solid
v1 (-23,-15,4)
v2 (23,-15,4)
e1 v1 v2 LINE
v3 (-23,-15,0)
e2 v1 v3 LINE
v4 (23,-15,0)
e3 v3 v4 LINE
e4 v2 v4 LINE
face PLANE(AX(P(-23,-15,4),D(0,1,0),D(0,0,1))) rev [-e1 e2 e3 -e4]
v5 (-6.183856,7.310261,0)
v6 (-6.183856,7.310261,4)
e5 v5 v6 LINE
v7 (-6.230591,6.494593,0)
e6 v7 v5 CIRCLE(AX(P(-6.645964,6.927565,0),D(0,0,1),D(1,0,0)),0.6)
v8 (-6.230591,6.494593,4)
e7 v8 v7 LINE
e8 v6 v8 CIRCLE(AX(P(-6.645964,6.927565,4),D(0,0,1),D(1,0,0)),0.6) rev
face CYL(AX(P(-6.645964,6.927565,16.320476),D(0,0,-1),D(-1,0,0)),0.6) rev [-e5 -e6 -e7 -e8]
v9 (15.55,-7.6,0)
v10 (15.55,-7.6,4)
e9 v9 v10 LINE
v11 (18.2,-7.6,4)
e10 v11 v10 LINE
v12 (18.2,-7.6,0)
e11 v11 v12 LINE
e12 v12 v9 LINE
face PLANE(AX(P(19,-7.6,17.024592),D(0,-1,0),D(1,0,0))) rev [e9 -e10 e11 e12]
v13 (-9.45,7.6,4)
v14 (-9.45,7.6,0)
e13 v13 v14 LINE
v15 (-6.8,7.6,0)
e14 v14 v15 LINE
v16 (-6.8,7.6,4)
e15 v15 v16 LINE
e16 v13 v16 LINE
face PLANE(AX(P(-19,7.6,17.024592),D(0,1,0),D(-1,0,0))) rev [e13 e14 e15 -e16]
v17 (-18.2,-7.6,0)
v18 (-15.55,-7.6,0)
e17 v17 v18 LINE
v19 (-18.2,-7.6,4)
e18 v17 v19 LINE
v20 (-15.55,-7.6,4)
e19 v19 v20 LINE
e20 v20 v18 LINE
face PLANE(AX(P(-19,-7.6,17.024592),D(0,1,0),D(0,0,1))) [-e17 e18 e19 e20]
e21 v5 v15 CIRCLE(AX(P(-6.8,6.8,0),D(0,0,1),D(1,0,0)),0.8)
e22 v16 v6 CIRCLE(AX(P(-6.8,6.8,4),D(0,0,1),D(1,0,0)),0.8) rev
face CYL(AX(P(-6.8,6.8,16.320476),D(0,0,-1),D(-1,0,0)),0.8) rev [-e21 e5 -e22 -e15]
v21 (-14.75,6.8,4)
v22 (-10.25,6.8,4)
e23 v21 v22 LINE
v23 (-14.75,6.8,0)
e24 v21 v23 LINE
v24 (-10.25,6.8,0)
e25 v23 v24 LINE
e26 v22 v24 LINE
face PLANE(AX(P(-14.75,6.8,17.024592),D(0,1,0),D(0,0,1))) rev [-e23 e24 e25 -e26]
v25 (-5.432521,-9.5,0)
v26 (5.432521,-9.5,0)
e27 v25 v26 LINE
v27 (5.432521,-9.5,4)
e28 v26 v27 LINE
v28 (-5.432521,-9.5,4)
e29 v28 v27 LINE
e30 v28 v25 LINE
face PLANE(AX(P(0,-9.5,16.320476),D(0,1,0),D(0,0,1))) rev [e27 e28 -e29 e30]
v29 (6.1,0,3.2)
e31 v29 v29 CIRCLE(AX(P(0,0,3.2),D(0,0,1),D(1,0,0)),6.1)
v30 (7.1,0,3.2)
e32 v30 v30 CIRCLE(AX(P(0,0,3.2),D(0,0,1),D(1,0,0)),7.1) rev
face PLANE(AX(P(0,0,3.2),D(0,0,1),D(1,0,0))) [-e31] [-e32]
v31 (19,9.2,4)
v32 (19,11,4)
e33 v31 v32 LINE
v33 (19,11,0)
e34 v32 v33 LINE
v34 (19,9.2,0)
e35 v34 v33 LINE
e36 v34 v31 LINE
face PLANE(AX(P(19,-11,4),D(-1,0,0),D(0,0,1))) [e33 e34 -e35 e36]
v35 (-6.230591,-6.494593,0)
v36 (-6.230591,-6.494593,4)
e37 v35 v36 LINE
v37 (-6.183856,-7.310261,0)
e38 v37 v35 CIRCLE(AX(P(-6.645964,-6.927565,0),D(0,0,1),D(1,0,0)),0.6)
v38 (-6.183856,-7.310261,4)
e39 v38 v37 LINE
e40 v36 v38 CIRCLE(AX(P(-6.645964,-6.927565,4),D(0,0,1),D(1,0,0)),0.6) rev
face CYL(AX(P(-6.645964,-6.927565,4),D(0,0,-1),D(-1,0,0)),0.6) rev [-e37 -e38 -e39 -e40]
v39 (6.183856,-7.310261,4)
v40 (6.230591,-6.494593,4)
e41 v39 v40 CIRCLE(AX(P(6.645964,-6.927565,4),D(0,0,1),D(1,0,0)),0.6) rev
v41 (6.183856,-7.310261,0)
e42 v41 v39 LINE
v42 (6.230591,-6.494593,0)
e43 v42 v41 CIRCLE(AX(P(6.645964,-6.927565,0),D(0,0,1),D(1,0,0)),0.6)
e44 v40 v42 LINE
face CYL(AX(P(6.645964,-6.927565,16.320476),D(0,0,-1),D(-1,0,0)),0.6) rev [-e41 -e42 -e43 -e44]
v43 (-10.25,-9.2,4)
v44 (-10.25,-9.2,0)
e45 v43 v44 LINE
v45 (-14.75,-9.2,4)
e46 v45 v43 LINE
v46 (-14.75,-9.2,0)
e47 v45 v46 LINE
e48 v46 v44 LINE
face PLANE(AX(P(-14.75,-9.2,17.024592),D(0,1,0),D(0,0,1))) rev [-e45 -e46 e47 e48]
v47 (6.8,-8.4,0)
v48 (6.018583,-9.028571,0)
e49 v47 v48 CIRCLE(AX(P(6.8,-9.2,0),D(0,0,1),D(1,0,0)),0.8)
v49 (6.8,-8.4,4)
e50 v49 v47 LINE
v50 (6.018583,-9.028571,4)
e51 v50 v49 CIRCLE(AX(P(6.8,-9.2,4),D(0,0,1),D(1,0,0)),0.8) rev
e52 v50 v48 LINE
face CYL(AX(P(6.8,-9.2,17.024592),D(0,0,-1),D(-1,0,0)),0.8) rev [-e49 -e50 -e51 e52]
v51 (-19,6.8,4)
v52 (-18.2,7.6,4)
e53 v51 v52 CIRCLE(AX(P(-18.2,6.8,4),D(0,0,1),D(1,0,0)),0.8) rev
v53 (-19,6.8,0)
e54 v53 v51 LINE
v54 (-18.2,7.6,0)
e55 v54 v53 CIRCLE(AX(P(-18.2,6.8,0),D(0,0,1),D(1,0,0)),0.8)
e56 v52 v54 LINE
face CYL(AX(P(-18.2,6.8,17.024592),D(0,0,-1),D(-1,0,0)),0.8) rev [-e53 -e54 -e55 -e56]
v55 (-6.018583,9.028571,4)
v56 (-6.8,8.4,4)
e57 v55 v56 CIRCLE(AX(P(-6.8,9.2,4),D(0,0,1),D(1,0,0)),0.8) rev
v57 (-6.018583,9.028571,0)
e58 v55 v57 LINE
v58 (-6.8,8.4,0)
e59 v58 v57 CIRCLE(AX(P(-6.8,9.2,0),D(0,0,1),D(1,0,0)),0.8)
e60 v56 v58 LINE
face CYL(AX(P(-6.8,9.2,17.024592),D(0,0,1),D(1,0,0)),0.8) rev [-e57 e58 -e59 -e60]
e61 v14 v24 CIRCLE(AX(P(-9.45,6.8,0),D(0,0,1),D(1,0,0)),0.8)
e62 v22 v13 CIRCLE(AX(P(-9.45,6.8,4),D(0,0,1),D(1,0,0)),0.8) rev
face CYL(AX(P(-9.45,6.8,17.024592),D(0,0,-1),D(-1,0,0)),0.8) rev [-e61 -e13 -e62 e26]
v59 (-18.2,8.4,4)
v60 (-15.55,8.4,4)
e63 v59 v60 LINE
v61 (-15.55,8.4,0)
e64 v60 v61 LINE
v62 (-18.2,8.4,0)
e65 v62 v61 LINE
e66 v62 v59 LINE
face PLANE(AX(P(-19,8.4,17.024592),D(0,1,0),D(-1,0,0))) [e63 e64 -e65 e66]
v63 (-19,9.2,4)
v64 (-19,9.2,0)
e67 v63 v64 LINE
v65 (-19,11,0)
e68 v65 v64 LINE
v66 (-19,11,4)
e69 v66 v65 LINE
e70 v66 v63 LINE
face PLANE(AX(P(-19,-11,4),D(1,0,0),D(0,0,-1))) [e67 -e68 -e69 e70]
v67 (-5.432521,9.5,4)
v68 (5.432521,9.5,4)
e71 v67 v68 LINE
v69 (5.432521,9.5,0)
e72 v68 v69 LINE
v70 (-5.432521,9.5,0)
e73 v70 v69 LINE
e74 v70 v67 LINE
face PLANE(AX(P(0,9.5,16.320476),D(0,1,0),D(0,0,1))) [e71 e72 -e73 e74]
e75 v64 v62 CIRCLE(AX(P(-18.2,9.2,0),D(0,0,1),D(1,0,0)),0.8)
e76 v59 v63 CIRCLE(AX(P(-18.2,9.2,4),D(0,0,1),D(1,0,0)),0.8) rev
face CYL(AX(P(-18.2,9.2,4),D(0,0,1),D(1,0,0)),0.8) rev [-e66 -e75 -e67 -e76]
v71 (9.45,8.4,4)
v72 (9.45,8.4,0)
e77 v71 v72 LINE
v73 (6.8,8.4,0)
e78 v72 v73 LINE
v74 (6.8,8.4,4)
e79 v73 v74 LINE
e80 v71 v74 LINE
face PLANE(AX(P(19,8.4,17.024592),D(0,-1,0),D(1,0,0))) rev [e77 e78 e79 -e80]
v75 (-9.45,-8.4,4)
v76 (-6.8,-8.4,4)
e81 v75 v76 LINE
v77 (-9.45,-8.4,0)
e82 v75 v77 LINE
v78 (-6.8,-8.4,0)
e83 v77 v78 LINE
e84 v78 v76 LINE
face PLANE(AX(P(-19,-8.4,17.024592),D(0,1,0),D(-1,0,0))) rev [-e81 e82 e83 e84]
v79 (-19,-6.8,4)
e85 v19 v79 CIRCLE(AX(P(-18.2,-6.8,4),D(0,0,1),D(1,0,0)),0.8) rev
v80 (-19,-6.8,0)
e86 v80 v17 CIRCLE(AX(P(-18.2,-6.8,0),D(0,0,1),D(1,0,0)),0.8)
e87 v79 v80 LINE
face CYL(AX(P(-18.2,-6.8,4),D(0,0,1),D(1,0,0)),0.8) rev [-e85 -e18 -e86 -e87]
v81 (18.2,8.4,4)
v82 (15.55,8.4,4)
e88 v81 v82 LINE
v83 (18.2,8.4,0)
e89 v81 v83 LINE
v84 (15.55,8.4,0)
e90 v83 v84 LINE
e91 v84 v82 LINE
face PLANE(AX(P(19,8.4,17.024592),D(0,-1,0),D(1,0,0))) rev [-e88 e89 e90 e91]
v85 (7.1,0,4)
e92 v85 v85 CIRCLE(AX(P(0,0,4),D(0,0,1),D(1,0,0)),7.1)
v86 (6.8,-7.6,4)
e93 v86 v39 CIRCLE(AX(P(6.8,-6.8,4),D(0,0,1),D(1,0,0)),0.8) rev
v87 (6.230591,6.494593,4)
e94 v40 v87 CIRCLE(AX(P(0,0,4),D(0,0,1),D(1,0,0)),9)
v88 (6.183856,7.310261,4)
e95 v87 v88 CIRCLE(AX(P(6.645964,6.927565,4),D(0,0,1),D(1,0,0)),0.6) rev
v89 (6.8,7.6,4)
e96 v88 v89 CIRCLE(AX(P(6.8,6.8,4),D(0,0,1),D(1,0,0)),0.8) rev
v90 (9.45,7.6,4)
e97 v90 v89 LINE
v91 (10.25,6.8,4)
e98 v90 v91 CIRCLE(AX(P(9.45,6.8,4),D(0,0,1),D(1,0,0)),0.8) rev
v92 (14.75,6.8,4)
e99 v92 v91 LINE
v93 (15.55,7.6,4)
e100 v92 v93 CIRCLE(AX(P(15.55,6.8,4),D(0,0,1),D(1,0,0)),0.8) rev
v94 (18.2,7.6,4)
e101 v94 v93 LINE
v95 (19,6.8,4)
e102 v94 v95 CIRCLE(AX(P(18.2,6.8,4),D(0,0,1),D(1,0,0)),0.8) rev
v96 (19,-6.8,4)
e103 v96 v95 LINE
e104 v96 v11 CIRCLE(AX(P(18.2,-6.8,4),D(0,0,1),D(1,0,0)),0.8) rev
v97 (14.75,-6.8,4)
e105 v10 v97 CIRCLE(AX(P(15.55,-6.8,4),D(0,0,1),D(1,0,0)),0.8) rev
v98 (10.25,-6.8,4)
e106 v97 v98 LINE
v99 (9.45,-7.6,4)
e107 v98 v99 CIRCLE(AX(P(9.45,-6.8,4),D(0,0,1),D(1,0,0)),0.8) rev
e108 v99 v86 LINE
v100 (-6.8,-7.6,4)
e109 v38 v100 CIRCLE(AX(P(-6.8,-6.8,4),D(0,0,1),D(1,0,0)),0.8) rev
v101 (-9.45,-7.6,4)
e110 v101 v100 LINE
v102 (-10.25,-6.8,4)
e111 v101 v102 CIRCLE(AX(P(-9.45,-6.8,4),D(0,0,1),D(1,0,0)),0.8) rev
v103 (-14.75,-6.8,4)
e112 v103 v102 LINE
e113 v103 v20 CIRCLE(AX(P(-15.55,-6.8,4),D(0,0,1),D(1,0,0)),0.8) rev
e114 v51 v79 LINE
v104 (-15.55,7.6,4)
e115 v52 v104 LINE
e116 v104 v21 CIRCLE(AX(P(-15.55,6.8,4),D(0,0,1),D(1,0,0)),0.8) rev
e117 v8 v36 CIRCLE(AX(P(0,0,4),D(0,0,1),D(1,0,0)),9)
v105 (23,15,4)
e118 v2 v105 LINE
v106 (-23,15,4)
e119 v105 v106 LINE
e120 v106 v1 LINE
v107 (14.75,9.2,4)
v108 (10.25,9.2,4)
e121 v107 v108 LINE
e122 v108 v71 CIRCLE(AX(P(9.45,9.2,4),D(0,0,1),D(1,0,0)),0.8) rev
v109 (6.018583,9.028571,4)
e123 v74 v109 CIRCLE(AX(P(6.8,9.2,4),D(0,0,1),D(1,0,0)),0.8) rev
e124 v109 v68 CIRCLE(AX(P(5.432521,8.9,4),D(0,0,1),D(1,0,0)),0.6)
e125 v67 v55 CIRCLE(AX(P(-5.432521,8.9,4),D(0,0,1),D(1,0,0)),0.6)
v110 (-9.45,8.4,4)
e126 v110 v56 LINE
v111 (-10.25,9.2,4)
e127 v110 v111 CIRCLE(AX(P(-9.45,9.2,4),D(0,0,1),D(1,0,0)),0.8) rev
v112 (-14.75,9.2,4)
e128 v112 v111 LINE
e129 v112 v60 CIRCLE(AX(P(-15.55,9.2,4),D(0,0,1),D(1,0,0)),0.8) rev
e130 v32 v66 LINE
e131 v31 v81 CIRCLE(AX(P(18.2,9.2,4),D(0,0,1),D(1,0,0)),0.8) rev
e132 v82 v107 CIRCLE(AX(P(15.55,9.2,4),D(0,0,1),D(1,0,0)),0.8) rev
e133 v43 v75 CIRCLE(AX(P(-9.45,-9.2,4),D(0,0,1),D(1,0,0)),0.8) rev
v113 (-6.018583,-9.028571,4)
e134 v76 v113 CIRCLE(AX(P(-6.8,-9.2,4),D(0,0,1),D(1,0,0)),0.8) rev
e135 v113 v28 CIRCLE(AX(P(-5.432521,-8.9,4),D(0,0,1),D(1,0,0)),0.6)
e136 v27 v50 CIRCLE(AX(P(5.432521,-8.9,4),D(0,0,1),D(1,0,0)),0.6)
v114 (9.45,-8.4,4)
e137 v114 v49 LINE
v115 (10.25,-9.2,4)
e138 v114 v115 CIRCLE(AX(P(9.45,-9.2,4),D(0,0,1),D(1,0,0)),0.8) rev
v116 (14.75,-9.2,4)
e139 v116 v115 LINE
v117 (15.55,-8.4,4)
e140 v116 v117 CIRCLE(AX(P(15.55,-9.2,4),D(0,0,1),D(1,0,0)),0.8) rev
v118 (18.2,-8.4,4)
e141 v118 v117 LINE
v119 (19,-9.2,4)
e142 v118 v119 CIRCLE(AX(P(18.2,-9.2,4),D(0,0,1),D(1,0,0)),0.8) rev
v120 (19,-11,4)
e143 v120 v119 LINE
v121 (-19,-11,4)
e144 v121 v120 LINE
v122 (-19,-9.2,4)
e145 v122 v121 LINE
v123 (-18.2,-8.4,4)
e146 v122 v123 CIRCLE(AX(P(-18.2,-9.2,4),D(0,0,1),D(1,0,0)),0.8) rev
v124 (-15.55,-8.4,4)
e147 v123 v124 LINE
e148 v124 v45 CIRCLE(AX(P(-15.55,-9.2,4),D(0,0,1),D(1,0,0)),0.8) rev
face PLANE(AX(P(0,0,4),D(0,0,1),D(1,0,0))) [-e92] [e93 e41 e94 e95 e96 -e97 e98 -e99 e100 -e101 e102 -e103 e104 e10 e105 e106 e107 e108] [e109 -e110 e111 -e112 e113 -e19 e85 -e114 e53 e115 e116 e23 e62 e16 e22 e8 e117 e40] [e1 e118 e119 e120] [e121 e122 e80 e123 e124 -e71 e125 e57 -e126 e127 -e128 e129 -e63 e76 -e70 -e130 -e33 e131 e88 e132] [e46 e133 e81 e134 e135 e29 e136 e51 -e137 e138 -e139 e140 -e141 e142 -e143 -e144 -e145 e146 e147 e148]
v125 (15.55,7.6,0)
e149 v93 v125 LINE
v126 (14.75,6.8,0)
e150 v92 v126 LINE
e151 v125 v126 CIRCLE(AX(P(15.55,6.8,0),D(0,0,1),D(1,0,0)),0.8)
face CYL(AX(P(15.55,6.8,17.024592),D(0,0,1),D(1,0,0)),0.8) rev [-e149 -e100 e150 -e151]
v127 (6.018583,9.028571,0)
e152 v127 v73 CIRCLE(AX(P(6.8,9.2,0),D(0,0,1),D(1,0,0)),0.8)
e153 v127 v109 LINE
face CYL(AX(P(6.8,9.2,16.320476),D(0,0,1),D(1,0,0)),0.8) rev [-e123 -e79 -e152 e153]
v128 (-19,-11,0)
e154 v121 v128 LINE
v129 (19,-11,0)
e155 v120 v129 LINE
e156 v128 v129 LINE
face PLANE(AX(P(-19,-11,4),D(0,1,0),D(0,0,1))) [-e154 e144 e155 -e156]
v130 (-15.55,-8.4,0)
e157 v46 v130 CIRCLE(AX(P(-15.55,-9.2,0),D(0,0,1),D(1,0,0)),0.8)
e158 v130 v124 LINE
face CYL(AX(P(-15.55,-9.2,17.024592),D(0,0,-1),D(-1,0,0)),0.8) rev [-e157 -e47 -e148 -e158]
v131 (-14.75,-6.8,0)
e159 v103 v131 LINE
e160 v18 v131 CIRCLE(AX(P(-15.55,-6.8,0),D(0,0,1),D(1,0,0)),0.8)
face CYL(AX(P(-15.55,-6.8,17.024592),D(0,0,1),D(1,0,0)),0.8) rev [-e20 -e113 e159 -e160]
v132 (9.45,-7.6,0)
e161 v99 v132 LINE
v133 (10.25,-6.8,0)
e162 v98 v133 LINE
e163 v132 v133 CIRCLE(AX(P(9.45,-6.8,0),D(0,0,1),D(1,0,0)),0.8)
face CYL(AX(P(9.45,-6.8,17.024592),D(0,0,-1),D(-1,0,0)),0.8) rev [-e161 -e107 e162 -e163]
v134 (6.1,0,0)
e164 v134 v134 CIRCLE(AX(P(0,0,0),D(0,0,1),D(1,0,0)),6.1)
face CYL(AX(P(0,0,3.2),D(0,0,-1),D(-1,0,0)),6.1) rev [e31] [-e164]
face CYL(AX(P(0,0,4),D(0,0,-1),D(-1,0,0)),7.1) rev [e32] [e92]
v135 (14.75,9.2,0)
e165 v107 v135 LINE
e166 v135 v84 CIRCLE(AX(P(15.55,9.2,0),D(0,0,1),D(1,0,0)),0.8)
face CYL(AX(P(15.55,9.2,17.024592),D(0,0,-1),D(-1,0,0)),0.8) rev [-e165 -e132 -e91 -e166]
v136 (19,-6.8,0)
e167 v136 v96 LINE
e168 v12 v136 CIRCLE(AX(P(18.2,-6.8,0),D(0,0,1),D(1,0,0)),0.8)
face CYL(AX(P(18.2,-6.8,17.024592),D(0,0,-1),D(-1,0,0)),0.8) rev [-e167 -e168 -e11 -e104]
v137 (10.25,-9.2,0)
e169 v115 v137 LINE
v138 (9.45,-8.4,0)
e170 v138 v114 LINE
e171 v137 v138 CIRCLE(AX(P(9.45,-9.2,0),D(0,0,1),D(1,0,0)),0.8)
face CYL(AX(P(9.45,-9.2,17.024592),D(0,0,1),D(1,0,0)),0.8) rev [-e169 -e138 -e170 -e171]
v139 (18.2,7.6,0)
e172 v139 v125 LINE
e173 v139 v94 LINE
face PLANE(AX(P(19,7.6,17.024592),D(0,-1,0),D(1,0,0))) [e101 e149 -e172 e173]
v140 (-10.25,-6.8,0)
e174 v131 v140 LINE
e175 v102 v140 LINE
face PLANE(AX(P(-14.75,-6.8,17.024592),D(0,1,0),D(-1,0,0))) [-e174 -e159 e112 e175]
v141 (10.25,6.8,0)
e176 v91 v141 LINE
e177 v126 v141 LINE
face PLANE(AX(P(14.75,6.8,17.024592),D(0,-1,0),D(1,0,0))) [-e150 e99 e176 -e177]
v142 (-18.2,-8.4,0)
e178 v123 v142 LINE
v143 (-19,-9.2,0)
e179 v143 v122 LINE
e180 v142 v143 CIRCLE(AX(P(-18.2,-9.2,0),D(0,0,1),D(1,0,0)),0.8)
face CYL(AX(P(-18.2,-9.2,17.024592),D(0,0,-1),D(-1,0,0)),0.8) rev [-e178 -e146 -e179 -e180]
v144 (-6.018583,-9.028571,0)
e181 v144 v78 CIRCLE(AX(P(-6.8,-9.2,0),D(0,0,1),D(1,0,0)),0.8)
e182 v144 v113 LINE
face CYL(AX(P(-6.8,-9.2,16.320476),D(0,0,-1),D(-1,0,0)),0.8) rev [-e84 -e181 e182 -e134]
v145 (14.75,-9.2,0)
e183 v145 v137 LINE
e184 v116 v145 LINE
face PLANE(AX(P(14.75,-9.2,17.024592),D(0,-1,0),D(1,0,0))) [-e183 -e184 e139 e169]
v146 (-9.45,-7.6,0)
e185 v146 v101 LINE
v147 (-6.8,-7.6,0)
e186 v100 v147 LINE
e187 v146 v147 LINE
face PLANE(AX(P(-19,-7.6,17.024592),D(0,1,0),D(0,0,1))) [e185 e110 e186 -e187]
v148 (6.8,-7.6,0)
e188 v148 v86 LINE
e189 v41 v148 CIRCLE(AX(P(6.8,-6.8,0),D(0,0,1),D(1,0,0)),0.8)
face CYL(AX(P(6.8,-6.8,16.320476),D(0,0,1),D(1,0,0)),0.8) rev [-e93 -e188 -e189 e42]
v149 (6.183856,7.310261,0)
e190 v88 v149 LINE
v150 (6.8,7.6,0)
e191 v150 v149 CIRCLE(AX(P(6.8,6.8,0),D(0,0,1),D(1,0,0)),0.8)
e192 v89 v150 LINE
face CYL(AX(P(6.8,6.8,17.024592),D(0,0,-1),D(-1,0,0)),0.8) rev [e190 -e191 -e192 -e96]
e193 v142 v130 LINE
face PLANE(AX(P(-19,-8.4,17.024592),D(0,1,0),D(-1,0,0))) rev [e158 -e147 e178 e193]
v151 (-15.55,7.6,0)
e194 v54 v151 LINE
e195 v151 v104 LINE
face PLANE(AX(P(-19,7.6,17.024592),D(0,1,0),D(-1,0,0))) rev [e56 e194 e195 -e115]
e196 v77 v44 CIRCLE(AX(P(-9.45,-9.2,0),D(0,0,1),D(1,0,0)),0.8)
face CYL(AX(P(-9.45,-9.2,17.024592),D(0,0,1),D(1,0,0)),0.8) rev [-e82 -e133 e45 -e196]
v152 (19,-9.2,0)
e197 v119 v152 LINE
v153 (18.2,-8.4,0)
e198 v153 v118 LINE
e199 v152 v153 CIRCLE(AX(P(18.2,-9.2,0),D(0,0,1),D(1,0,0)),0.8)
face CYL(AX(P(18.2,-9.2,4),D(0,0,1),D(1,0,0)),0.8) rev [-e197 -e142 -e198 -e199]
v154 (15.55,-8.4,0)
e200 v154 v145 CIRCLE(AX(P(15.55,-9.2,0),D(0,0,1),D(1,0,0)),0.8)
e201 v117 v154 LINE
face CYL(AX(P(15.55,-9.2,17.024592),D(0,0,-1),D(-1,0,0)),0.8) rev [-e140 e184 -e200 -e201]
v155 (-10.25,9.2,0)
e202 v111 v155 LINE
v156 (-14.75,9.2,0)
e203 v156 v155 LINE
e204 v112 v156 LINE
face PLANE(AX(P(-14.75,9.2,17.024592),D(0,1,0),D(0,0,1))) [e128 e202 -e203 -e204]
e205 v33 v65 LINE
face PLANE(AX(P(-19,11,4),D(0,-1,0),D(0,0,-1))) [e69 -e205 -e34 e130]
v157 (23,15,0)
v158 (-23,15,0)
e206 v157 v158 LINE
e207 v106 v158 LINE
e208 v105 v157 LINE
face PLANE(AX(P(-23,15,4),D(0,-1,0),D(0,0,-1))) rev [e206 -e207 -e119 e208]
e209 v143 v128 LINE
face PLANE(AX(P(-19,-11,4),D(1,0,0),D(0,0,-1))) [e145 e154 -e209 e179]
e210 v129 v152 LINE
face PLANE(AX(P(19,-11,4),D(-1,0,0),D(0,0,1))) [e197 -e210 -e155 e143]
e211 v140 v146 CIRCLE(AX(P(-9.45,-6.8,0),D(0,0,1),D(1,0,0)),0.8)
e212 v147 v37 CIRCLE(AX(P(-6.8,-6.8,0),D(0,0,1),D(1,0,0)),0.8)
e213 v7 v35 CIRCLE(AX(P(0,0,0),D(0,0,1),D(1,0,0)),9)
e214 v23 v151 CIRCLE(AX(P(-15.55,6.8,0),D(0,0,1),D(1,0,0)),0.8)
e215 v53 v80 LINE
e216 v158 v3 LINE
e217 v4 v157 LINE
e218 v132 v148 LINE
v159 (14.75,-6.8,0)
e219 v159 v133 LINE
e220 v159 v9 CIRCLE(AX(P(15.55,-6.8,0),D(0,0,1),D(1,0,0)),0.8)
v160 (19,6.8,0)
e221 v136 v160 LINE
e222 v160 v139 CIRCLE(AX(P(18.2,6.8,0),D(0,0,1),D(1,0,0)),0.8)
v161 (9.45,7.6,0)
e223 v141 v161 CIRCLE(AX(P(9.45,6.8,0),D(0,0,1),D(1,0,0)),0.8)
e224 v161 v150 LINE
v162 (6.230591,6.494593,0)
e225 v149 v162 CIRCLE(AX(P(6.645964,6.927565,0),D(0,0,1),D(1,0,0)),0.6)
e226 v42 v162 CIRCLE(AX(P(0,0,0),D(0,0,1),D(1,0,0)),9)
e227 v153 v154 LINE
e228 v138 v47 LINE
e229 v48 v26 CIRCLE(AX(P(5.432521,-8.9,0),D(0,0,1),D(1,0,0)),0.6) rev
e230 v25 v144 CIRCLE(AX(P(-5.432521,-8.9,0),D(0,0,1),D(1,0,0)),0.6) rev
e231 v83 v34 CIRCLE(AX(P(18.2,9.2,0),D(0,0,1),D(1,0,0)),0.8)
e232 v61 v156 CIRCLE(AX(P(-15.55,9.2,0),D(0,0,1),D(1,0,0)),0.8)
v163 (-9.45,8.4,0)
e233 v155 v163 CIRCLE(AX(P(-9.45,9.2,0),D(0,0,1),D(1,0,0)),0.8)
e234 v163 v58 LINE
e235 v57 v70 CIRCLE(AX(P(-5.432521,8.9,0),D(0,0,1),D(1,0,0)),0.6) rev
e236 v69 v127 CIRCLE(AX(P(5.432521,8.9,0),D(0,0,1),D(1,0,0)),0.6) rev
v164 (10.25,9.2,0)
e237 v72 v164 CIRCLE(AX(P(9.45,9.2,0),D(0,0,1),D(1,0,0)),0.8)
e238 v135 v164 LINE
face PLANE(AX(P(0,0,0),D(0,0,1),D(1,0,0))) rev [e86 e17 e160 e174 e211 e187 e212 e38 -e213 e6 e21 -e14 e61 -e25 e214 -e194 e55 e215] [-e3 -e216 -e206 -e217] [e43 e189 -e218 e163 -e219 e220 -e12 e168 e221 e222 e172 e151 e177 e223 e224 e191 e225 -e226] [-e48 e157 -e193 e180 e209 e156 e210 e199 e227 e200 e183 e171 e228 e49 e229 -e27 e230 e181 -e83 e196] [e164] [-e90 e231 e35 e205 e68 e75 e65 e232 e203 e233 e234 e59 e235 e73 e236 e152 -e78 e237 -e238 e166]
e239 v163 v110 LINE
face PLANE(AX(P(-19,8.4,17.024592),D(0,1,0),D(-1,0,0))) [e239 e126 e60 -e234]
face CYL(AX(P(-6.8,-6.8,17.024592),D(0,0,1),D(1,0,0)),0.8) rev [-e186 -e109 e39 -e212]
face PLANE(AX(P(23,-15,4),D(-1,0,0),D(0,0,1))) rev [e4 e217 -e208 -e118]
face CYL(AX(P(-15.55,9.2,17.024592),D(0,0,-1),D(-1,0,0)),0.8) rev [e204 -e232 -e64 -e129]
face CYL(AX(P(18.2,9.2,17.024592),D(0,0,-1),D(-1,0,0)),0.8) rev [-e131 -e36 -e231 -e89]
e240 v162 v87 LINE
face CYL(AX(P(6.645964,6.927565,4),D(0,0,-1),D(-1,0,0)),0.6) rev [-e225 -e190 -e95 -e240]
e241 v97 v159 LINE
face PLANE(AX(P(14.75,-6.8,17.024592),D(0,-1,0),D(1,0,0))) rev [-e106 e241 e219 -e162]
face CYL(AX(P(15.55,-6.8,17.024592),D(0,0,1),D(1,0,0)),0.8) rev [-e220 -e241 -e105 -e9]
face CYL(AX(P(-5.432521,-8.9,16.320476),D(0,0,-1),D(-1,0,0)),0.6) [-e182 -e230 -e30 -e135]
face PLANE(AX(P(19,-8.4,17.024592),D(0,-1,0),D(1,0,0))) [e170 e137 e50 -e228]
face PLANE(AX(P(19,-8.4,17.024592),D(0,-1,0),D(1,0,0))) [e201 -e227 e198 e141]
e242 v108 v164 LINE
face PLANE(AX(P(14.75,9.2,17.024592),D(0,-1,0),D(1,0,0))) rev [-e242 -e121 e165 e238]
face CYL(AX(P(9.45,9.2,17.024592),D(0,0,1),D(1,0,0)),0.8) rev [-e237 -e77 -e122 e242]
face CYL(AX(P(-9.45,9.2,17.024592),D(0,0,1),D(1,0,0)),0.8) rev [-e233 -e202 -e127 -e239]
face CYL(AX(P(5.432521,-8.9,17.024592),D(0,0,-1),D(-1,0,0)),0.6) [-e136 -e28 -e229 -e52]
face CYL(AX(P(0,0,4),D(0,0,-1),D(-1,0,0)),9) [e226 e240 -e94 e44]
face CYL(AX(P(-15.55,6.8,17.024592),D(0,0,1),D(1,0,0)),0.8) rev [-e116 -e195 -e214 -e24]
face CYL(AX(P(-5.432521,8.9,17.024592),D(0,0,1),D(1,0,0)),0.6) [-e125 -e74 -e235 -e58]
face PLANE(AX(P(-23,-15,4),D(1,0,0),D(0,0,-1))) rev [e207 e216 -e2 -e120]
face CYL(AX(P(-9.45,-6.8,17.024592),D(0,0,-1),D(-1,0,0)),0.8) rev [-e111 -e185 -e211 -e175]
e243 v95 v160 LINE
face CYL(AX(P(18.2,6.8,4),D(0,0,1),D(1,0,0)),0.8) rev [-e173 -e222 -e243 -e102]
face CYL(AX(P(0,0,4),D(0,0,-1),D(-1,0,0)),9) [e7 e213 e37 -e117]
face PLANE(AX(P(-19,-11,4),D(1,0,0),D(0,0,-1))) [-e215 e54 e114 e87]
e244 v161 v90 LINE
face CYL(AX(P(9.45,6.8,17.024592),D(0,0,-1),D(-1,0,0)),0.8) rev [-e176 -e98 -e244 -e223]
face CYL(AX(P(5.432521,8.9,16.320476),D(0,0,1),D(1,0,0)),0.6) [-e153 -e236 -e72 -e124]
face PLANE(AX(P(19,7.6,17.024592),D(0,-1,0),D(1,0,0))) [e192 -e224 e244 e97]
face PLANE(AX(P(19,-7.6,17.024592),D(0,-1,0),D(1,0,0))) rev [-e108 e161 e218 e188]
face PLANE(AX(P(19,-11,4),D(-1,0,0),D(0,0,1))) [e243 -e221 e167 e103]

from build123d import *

# Parameters (mm, degrees)
SKETCH_2_R      = 7.1
SKETCH_2_R_2    = 6.1
EXTRUDE_1_DEPTH = 3.2
SKETCH_2_3_R    = 9
SKETCH_2_3_R_2  = 7.1
EXTRUDE_2_DEPTH = 4
EXTRUDE_3_DEPTH = 4
SKETCH_4_W      = 46
SKETCH_4_H      = 30
SKETCH_4_W_2    = 38
SKETCH_4_H_2    = 22
EXTRUDE_4_DEPTH = 4
SKETCH_5_W      = 13
SKETCH_5_H      = 0.8
SKETCH_5_W_2    = 4.5
SKETCH_5_H_2    = 2.4
EXTRUDE_5_DEPTH = 4
FILLET_1_R      = 0.8
FILLET_2_R      = 0.6


with BuildPart() as part:
    # 草图2 → 凸台-拉伸1 (new body)
    with BuildSketch(Plane.XY):
        Circle(SKETCH_2_R)
        Circle(SKETCH_2_R_2, mode=Mode.SUBTRACT)
    extrude(amount=EXTRUDE_1_DEPTH)

    # 草图2<3> → 凸台-拉伸2 (add)
    with BuildSketch(Plane.XY):
        Circle(SKETCH_2_3_R)
        Circle(SKETCH_2_3_R_2, mode=Mode.SUBTRACT)
    extrude(amount=EXTRUDE_2_DEPTH)

    # 草图3 → 凸台-拉伸3 (add)
    with BuildSketch(Plane.XY):
        with BuildLine():
            Line((6, 6.708203932), (6, 9.5))
            Line((6, 9.5), (-6, 9.5))
            Line((-6, 9.5), (-6, 6.708203932))
            ThreePointArc((-6, 6.708203932), (0, 9), (6, 6.708203932))
        make_face()
        with BuildLine():
            Line((-6, -9.5), (6, -9.5))
            Line((6, -9.5), (6, -6.708203932))
            ThreePointArc((6, -6.708203932), (0, -9), (-6, -6.708203932))
            Line((-6, -6.708203932), (-6, -9.5))
        make_face()
    extrude(amount=EXTRUDE_3_DEPTH)



with BuildPart() as body_2:
    # 草图4 → 凸台-拉伸4 (new body)
    with BuildSketch(Plane.XY):
        Rectangle(SKETCH_4_W, SKETCH_4_H)
        Rectangle(SKETCH_4_W_2, SKETCH_4_H_2, mode=Mode.SUBTRACT)
    extrude(amount=EXTRUDE_4_DEPTH)


with BuildPart() as part_1:
    add(part.part)

    add(body_2.part)  # 凸台-拉伸5 merges body 2
    # 草图5 → 凸台-拉伸5 (add)
    with BuildSketch(Plane.XY):
        with Locations((-12.5, 8)):
            Rectangle(SKETCH_5_W, SKETCH_5_H)
        with Locations((12.5, 8)):
            Rectangle(SKETCH_5_W, SKETCH_5_H)
        with Locations((-12.5, -8)):
            Rectangle(SKETCH_5_W, SKETCH_5_H)
        with Locations((12.5, -8)):
            Rectangle(SKETCH_5_W, SKETCH_5_H)
        with Locations((12.5, 8)):
            Rectangle(SKETCH_5_W_2, SKETCH_5_H_2)
        with Locations((-12.5, 8)):
            Rectangle(SKETCH_5_W_2, SKETCH_5_H_2)
        with Locations((12.5, -8)):
            Rectangle(SKETCH_5_W_2, SKETCH_5_H_2)
        with Locations((-12.5, -8)):
            Rectangle(SKETCH_5_W_2, SKETCH_5_H_2)
    extrude(amount=EXTRUDE_5_DEPTH)

    # 圆角1
    fillet_1_edges = [part_1.edges().sort_by_distance(p)[0] for p in [
        (19, 7.6, 2),
        (19, -7.6, 2),
        (-19, -7.6, 2),
        (-19, 7.6, 2),
        (-6, 7.6, 2),
        (6, 7.6, 2),
        (6, -7.6, 2),
        (-6, -7.6, 2),
        (-6, -8.4, 2),
        (6, -8.4, 2),
        (6, 8.4, 2),
        (-6, 8.4, 2),
        (-19, 8.4, 2),
        (19, 8.4, 2),
        (-19, -8.4, 2),
        (19, -8.4, 2),
        (-10.25, 7.6, 2),
        (-10.25, 8.4, 2),
        (-14.75, 8.4, 2),
        (-14.75, 7.6, 2),
        (14.75, 7.6, 2),
        (14.75, 8.4, 2),
        (10.25, 8.4, 2),
        (10.25, 7.6, 2),
        (14.75, -8.4, 2),
        (14.75, -7.6, 2),
        (10.25, -7.6, 2),
        (10.25, -8.4, 2),
        (-10.25, -8.4, 2),
        (-10.25, -7.6, 2),
        (-14.75, -7.6, 2),
        (-14.75, -8.4, 2),
    ]]
    fillet(fillet_1_edges, radius=FILLET_1_R - 0.0001)  # a hair under: the kernel refuses the full size

    # 圆角2
    fillet_2_edges = [part_1.edges().sort_by_distance(p)[0] for p in [
        (-6, -9.5, 2),
        (6, 9.5, 2),
        (6, -9.5, 2),
        (-6, 9.5, 2),
        (6, -6.708203932, 2),
        (-6, 6.708203932, 2),
        (6, 6.708203932, 2),
        (-6, -6.708203932, 2),
    ]]
    fillet(fillet_2_edges, radius=FILLET_2_R)


solid = part_1.part
